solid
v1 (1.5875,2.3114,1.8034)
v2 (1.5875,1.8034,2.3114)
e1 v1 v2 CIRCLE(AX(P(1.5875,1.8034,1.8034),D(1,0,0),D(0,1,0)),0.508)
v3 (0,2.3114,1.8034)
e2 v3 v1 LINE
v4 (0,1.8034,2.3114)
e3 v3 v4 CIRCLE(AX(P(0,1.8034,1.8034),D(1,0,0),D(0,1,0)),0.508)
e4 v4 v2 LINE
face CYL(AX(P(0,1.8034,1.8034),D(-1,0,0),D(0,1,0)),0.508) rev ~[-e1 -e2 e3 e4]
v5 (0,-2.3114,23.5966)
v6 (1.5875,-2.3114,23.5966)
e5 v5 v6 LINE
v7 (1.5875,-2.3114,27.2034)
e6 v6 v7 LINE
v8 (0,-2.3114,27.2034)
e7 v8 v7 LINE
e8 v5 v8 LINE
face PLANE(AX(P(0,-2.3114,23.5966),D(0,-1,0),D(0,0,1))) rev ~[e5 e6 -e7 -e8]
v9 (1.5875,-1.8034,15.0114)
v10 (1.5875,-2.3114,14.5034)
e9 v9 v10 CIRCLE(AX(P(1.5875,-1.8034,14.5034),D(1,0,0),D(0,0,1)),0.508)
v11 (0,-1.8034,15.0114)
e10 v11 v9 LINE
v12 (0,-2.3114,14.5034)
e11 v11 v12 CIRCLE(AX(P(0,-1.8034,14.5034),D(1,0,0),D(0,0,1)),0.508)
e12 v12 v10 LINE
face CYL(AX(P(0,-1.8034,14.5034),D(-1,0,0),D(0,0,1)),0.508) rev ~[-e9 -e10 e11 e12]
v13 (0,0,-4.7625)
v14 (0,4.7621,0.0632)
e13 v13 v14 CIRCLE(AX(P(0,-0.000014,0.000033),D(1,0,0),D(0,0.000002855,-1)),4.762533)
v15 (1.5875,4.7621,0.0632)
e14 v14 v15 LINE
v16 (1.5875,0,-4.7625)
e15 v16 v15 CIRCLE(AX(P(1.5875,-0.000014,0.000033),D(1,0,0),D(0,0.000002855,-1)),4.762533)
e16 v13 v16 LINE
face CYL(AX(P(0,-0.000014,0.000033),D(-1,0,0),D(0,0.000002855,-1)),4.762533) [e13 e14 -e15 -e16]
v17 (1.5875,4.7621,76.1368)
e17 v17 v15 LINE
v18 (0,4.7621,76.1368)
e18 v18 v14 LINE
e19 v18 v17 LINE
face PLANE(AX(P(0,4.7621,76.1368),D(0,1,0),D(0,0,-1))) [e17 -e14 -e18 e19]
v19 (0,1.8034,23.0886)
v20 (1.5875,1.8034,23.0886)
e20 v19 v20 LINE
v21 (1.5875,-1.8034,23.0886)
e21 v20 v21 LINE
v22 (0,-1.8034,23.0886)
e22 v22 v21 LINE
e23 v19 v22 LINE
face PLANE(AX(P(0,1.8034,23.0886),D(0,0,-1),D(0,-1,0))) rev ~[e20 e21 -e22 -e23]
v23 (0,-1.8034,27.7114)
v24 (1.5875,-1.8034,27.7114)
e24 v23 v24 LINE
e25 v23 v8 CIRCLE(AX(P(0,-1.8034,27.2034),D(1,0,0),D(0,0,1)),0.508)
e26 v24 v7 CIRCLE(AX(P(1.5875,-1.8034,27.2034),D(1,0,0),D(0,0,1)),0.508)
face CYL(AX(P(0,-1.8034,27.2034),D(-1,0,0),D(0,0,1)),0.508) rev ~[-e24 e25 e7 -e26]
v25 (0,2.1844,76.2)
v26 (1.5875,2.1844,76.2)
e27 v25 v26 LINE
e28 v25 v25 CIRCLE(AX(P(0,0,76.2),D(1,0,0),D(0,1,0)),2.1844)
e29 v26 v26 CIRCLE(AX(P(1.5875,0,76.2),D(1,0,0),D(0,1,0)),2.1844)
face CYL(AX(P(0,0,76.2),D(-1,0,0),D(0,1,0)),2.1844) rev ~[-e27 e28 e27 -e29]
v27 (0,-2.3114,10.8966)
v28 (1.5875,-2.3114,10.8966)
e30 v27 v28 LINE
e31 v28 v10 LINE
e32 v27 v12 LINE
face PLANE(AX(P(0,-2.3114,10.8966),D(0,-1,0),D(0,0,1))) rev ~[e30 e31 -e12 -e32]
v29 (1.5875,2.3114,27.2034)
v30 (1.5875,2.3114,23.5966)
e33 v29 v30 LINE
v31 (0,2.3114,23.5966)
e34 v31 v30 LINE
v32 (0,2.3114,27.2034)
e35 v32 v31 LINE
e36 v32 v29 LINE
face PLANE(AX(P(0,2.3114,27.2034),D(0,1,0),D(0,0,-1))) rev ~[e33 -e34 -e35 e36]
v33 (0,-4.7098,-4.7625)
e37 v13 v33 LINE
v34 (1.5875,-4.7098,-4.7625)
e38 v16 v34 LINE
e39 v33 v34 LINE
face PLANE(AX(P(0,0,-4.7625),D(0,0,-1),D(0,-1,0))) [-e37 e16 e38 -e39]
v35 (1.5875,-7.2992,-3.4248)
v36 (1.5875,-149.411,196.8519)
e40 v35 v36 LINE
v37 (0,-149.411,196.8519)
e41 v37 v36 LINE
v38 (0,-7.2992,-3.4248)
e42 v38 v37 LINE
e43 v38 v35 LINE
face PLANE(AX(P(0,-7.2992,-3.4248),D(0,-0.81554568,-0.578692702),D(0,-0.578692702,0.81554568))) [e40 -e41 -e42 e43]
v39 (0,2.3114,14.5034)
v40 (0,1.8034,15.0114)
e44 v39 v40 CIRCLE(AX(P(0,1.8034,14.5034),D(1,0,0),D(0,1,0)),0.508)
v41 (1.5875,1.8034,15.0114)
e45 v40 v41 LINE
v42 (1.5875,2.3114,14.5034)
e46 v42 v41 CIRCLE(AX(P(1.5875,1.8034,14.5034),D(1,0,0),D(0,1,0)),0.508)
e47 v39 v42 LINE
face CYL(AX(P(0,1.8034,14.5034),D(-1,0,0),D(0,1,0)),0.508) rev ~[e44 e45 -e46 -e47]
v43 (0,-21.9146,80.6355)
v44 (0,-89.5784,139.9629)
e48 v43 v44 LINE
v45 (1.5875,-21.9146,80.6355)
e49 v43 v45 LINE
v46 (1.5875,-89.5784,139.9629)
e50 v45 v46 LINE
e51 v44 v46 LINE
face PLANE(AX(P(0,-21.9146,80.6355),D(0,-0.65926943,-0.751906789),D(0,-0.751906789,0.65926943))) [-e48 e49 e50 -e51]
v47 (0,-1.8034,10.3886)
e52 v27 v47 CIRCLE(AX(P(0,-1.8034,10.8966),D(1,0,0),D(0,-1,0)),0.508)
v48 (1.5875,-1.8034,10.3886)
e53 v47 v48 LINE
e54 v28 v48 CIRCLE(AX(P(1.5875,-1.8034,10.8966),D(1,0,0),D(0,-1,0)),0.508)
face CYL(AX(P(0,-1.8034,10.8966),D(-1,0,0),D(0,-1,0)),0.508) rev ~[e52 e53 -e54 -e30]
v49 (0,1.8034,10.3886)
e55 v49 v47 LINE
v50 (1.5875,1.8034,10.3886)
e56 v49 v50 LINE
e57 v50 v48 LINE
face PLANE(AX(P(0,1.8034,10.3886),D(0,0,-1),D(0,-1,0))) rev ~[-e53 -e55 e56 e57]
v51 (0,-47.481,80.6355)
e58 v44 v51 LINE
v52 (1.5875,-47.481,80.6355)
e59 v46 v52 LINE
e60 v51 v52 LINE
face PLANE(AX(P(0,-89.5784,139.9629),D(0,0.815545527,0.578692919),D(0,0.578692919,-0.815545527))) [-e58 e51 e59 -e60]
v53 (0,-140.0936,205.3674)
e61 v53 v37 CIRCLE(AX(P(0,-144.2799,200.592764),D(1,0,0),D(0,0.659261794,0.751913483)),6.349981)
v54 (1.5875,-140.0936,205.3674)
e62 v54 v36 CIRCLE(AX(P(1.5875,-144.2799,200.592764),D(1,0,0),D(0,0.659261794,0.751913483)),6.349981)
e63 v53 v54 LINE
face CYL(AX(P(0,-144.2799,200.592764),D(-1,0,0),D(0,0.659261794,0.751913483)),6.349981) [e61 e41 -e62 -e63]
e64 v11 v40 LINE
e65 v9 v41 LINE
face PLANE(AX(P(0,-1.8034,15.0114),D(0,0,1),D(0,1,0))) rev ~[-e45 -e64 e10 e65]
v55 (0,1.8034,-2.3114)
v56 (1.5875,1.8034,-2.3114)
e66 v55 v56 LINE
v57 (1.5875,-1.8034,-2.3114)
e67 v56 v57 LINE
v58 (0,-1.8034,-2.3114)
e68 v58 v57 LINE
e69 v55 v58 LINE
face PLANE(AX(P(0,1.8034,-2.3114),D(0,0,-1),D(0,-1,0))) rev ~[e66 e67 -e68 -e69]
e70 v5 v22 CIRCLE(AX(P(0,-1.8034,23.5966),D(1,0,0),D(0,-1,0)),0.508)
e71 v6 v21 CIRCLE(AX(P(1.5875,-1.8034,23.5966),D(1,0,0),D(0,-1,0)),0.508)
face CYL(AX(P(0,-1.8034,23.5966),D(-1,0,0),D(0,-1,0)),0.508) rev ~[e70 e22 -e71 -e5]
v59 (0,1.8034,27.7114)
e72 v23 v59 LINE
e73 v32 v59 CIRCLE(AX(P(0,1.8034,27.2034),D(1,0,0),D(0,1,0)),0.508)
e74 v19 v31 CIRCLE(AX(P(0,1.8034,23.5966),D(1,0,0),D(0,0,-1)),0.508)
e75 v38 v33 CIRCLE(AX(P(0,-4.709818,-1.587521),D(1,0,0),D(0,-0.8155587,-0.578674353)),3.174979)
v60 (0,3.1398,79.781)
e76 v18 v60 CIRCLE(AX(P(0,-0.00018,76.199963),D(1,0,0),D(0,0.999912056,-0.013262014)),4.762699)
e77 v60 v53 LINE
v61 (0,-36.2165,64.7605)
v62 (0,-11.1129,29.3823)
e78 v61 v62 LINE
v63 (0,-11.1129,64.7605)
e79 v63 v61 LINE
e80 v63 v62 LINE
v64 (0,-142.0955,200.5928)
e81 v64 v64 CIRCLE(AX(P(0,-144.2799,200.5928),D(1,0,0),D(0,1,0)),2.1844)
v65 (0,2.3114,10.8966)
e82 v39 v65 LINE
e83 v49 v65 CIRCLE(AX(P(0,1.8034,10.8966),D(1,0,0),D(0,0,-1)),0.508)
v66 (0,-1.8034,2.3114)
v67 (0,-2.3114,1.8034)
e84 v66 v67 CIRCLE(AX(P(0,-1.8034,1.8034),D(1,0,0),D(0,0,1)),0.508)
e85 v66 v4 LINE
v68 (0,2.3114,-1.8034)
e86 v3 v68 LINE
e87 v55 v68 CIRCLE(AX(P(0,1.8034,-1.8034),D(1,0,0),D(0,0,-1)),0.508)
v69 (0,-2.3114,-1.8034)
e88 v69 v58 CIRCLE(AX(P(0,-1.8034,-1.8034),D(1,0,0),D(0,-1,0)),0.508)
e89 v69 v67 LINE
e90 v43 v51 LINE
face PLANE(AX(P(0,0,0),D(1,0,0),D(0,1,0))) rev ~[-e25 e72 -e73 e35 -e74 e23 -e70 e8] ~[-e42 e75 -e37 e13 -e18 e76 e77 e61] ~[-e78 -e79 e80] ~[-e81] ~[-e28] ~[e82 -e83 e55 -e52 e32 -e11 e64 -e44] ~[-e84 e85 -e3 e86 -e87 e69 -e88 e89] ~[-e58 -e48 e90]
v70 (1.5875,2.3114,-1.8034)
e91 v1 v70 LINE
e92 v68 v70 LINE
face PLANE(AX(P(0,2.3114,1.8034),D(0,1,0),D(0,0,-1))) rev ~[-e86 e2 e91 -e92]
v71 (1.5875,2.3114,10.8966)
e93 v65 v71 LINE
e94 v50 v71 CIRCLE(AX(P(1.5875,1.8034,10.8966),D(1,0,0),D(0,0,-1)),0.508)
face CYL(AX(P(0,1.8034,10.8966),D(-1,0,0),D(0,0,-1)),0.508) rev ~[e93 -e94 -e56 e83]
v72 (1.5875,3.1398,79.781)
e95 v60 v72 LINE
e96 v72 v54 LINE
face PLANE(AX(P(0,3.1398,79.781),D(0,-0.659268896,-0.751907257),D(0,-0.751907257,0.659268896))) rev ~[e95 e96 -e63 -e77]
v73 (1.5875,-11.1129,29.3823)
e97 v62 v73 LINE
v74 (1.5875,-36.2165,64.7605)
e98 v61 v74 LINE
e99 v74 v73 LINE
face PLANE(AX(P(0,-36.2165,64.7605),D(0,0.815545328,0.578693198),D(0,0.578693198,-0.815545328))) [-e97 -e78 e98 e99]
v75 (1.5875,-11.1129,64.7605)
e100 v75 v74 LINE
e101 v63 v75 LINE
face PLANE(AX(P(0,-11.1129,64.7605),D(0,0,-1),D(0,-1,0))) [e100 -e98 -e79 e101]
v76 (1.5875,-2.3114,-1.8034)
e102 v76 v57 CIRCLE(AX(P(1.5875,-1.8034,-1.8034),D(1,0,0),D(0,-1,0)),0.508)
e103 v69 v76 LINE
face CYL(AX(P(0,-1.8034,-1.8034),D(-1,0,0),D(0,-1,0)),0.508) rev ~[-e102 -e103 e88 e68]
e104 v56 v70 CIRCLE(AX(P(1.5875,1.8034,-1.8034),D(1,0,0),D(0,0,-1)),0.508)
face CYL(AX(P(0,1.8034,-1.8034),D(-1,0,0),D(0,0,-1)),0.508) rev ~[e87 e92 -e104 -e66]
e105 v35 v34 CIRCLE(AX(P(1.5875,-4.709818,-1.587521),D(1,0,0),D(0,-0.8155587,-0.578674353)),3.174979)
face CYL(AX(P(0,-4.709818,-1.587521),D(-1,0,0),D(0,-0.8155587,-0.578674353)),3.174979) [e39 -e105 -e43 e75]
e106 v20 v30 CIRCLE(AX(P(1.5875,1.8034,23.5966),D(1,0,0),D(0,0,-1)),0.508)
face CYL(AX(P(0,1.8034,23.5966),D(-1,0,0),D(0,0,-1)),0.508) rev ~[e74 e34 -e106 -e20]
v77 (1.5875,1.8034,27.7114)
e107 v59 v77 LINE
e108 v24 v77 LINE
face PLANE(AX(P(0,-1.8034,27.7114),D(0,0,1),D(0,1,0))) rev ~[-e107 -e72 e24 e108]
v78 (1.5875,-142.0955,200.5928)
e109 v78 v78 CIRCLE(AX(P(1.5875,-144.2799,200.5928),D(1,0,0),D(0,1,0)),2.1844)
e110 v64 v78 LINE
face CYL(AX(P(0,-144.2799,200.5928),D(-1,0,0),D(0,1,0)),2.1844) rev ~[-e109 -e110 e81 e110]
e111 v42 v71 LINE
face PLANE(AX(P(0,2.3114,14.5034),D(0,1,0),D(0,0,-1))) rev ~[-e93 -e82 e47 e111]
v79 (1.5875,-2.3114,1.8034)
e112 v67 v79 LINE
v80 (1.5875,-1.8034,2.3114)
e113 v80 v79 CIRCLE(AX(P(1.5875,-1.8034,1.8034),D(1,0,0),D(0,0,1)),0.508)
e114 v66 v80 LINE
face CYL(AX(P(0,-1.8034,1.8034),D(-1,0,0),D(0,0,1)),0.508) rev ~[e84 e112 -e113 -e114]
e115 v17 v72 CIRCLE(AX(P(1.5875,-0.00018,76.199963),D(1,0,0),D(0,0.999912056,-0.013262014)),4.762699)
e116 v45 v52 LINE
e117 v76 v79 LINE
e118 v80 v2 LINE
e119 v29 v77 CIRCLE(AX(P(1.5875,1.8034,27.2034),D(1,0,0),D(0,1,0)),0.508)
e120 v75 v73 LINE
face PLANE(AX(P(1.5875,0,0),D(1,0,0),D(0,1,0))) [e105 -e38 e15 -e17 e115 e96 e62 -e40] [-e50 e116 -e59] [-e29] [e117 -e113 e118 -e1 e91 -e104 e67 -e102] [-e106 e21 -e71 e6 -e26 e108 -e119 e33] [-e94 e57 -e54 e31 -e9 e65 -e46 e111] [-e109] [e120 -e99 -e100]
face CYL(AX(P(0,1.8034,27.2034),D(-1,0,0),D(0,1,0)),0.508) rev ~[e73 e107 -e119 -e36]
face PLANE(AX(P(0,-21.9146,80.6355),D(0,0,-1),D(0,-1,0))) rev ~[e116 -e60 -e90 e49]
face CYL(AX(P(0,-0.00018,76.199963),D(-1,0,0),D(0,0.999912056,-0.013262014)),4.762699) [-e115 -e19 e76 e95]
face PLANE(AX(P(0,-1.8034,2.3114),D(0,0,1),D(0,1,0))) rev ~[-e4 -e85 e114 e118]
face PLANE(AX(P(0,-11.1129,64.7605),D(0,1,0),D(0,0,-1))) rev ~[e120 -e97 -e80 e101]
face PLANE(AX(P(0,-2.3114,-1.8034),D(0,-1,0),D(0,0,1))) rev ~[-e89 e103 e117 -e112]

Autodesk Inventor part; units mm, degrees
ref_plane "YZ Plane" through (0, 0, 0) normal (1, 0, 0) x (0, 1, 0)
ref_plane "XZ Plane" through (0, 0, 0) normal (0, 1, 0) x (-1, 0, 0)
ref_plane "XY Plane" through (0, 0, 0) normal (0, 0, 1) x (1, 0, 0)
sketch "main" plane through (0, 0, 0) normal (0, 0, 1) x (1, 0, 0)
  circle A0 centre (2982.9462, -106.4126) radius 2.1844
  circle A1 centre (2838.6663, 17.9802) radius 2.1844
  arc A2 (2982.9462, -187.3751) -> (2987.7082, -182.5494) centre (2982.9462, -182.6126) ccw
  arc A3 (2987.7082, -106.4758) -> (2986.0859, -102.8316) centre (2982.9462, -106.4126) ccw
  arc A4 (2842.8526, 22.7548) -> (2833.5352, 14.2393) centre (2838.6663, 17.9802) ccw
  line L0 (2987.7082, -106.4758) -> (2987.7082, -182.5494)
  line L1 (2986.0859, -102.8316) -> (2842.8526, 22.7548)
  line L2 (2981.1428, -180.3012) -> (2984.7496, -180.3012)
  line L3 (2985.2576, -180.8092) -> (2985.2576, -184.416)
  line L4 (2984.7496, -184.924) -> (2981.1428, -184.924)
  line L5 (2980.6348, -184.416) -> (2980.6348, -180.8092)
  line L6 (2980.6348, -180.3012) -> (2985.2576, -184.924) construction
  line L7 (2985.2576, -180.3012) -> (2980.6348, -184.924) construction
  line L8 (2981.1428, -167.6012) -> (2984.7496, -167.6012)
  line L9 (2985.2576, -168.1092) -> (2985.2576, -171.716)
  line L10 (2984.7496, -172.224) -> (2981.1428, -172.224)
  line L11 (2980.6348, -171.716) -> (2980.6348, -168.1092)
  line L12 (2980.6348, -167.6012) -> (2985.2576, -172.224) construction
  line L13 (2985.2576, -167.6012) -> (2980.6348, -172.224) construction
  line L14 (2981.1428, -154.9012) -> (2984.7496, -154.9012)
  line L15 (2985.2576, -155.4092) -> (2985.2576, -159.016)
  line L16 (2984.7496, -159.524) -> (2981.1428, -159.524)
  line L17 (2980.6348, -159.016) -> (2980.6348, -155.4092)
  line L18 (2980.6348, -154.9012) -> (2985.2576, -159.524) construction
  line L19 (2985.2576, -154.9012) -> (2980.6348, -159.524) construction
  arc A5 (2984.7496, -184.924) -> (2985.2576, -184.416) centre (2984.7496, -184.416) ccw
  arc A6 (2980.6348, -184.416) -> (2981.1428, -184.924) centre (2981.1428, -184.416) ccw
  arc A7 (2981.1428, -180.3012) -> (2980.6348, -180.8092) centre (2981.1428, -180.8092) ccw
  arc A8 (2985.2576, -180.8092) -> (2984.7496, -180.3012) centre (2984.7496, -180.8092) ccw
  arc A9 (2984.7496, -172.224) -> (2985.2576, -171.716) centre (2984.7496, -171.716) ccw
  arc A10 (2980.6348, -171.716) -> (2981.1428, -172.224) centre (2981.1428, -171.716) ccw
  arc A11 (2981.1428, -167.6012) -> (2980.6348, -168.1092) centre (2981.1428, -168.1092) ccw
  arc A12 (2985.2576, -168.1092) -> (2984.7496, -167.6012) centre (2984.7496, -168.1092) ccw
  arc A13 (2984.7496, -159.524) -> (2985.2576, -159.016) centre (2984.7496, -159.016) ccw
  arc A14 (2980.6348, -159.016) -> (2981.1428, -159.524) centre (2981.1428, -159.016) ccw
  arc A15 (2981.1428, -154.9012) -> (2980.6348, -155.4092) centre (2981.1428, -155.4092) ccw
  arc A16 (2985.2576, -155.4092) -> (2984.7496, -154.9012) centre (2984.7496, -155.4092) ccw
  line L20 (2982.9462, -187.3751) -> (2978.2364, -187.3751)
  line L21 (2975.647, -186.0374) -> (2833.5352, 14.2393)
  arc A17 (2975.647, -186.0374) -> (2978.2364, -187.3751) centre (2978.2364, -184.2001) ccw
  line L22 (2961.0316, -101.9771) -> (2893.3678, -42.6497)
  line L23 (2971.8332, -117.8521) -> (2971.8332, -153.2302)
  line L24 (2961.0316, -101.9771) -> (2935.4651, -101.9771)
  line L25 (2971.8332, -117.8521) -> (2946.7297, -117.8521)
  line L26 (2893.3678, -42.6497) -> (2935.4651, -101.9771)
  line L27 (2946.7297, -117.8521) -> (2971.8332, -153.2302)
  point P0 (2935.9211, -90.1281)
  point P1 (2982.9462, -169.9126)
  point P2 (2982.9462, -157.2126)
  point P3 (2976.5962, -187.3751)
  point P4 (2959.2815, -117.8521)
  dimension "d0" = 12.7
  dimension "d1" = 9.525
  dimension "d2" = 9.525
  dimension "d7" = 4.6228
  dimension "d8" = 4.6228
  dimension "d9" = 4.6228
  dimension "d10" = 4.6228
  dimension "d11" = 4.6228
  dimension "d12" = 4.6228
  dimension "d13" = 0.508
  dimension "d14" = 6.35
  dimension "d15" = 3.175
  dimension "d18" = 15.875
  dimension "d19" = 15.875
  dimension "d20" = 15.875
  dimension "d21" = 15.875
  dimension "d22" = 15.875
sketch "Sketch1" plane through (0, 0, 0) normal (1, 0, 0) x (0, 1, 0)
  circle A0 centre (0, 76.2) radius 2.1844
  circle A1 centre (-144.2799, 200.5928) radius 2.1844
  arc A2 (0, -4.7625) -> (4.7621, 0.0632) centre (0, 0) ccw
  arc A3 (4.7621, 76.1368) -> (3.1398, 79.781) centre (0, 76.2) ccw
  arc A4 (-140.0936, 205.3674) -> (-149.411, 196.8519) centre (-144.2799, 200.5928) ccw
  line L0 (4.7621, 76.1368) -> (4.7621, 0.0632)
  line L1 (3.1398, 79.781) -> (-140.0936, 205.3674)
  line L2 (-1.8034, 2.3114) -> (1.8034, 2.3114)
  line L3 (2.3114, 1.8034) -> (2.3114, -1.8034)
  line L4 (1.8034, -2.3114) -> (-1.8034, -2.3114)
  line L5 (-2.3114, -1.8034) -> (-2.3114, 1.8034)
  line L6 (-2.3114, 2.3114) -> (2.3114, -2.3114) construction
  line L7 (2.3114, 2.3114) -> (-2.3114, -2.3114) construction
  line L8 (-1.8034, 15.0114) -> (1.8034, 15.0114)
  line L9 (2.3114, 14.5034) -> (2.3114, 10.8966)
  line L10 (1.8034, 10.3886) -> (-1.8034, 10.3886)
  line L11 (-2.3114, 10.8966) -> (-2.3114, 14.5034)
  line L12 (-2.3114, 15.0114) -> (2.3114, 10.3886) construction
  line L13 (2.3114, 15.0114) -> (-2.3114, 10.3886) construction
  line L14 (-1.8034, 27.7114) -> (1.8034, 27.7114)
  line L15 (2.3114, 27.2034) -> (2.3114, 23.5966)
  line L16 (1.8034, 23.0886) -> (-1.8034, 23.0886)
  line L17 (-2.3114, 23.5966) -> (-2.3114, 27.2034)
  line L18 (-2.3114, 27.7114) -> (2.3114, 23.0886) construction
  line L19 (2.3114, 27.7114) -> (-2.3114, 23.0886) construction
  arc A5 (1.8034, -2.3114) -> (2.3114, -1.8034) centre (1.8034, -1.8034) ccw
  arc A6 (-2.3114, -1.8034) -> (-1.8034, -2.3114) centre (-1.8034, -1.8034) ccw
  arc A7 (-1.8034, 2.3114) -> (-2.3114, 1.8034) centre (-1.8034, 1.8034) ccw
  arc A8 (2.3114, 1.8034) -> (1.8034, 2.3114) centre (1.8034, 1.8034) ccw
  arc A9 (1.8034, 10.3886) -> (2.3114, 10.8966) centre (1.8034, 10.8966) ccw
  arc A10 (-2.3114, 10.8966) -> (-1.8034, 10.3886) centre (-1.8034, 10.8966) ccw
  arc A11 (-1.8034, 15.0114) -> (-2.3114, 14.5034) centre (-1.8034, 14.5034) ccw
  arc A12 (2.3114, 14.5034) -> (1.8034, 15.0114) centre (1.8034, 14.5034) ccw
  arc A13 (1.8034, 23.0886) -> (2.3114, 23.5966) centre (1.8034, 23.5966) ccw
  arc A14 (-2.3114, 23.5966) -> (-1.8034, 23.0886) centre (-1.8034, 23.5966) ccw
  arc A15 (-1.8034, 27.7114) -> (-2.3114, 27.2034) centre (-1.8034, 27.2034) ccw
  arc A16 (2.3114, 27.2034) -> (1.8034, 27.7114) centre (1.8034, 27.2034) ccw
  line L20 (0, -4.7625) -> (-4.7098, -4.7625)
  line L21 (-7.2992, -3.4248) -> (-149.411, 196.8519)
  arc A17 (-7.2992, -3.4248) -> (-4.7098, -4.7625) centre (-4.7098, -1.5875) ccw
  line L22 (-21.9146, 80.6355) -> (-89.5784, 139.9629)
  line L23 (-11.1129, 64.7605) -> (-11.1129, 29.3823)
  line L24 (-21.9146, 80.6355) -> (-47.481, 80.6355)
  line L25 (-11.1129, 64.7605) -> (-36.2165, 64.7605)
  line L26 (-89.5784, 139.9629) -> (-47.481, 80.6355)
  line L27 (-36.2165, 64.7605) -> (-11.1129, 29.3823)
extrude "Extrusion1" add sketch "Sketch1" along normal blind 1.5875
properties part number "Triiangle Gusset" material "Acetal Resin, White"
